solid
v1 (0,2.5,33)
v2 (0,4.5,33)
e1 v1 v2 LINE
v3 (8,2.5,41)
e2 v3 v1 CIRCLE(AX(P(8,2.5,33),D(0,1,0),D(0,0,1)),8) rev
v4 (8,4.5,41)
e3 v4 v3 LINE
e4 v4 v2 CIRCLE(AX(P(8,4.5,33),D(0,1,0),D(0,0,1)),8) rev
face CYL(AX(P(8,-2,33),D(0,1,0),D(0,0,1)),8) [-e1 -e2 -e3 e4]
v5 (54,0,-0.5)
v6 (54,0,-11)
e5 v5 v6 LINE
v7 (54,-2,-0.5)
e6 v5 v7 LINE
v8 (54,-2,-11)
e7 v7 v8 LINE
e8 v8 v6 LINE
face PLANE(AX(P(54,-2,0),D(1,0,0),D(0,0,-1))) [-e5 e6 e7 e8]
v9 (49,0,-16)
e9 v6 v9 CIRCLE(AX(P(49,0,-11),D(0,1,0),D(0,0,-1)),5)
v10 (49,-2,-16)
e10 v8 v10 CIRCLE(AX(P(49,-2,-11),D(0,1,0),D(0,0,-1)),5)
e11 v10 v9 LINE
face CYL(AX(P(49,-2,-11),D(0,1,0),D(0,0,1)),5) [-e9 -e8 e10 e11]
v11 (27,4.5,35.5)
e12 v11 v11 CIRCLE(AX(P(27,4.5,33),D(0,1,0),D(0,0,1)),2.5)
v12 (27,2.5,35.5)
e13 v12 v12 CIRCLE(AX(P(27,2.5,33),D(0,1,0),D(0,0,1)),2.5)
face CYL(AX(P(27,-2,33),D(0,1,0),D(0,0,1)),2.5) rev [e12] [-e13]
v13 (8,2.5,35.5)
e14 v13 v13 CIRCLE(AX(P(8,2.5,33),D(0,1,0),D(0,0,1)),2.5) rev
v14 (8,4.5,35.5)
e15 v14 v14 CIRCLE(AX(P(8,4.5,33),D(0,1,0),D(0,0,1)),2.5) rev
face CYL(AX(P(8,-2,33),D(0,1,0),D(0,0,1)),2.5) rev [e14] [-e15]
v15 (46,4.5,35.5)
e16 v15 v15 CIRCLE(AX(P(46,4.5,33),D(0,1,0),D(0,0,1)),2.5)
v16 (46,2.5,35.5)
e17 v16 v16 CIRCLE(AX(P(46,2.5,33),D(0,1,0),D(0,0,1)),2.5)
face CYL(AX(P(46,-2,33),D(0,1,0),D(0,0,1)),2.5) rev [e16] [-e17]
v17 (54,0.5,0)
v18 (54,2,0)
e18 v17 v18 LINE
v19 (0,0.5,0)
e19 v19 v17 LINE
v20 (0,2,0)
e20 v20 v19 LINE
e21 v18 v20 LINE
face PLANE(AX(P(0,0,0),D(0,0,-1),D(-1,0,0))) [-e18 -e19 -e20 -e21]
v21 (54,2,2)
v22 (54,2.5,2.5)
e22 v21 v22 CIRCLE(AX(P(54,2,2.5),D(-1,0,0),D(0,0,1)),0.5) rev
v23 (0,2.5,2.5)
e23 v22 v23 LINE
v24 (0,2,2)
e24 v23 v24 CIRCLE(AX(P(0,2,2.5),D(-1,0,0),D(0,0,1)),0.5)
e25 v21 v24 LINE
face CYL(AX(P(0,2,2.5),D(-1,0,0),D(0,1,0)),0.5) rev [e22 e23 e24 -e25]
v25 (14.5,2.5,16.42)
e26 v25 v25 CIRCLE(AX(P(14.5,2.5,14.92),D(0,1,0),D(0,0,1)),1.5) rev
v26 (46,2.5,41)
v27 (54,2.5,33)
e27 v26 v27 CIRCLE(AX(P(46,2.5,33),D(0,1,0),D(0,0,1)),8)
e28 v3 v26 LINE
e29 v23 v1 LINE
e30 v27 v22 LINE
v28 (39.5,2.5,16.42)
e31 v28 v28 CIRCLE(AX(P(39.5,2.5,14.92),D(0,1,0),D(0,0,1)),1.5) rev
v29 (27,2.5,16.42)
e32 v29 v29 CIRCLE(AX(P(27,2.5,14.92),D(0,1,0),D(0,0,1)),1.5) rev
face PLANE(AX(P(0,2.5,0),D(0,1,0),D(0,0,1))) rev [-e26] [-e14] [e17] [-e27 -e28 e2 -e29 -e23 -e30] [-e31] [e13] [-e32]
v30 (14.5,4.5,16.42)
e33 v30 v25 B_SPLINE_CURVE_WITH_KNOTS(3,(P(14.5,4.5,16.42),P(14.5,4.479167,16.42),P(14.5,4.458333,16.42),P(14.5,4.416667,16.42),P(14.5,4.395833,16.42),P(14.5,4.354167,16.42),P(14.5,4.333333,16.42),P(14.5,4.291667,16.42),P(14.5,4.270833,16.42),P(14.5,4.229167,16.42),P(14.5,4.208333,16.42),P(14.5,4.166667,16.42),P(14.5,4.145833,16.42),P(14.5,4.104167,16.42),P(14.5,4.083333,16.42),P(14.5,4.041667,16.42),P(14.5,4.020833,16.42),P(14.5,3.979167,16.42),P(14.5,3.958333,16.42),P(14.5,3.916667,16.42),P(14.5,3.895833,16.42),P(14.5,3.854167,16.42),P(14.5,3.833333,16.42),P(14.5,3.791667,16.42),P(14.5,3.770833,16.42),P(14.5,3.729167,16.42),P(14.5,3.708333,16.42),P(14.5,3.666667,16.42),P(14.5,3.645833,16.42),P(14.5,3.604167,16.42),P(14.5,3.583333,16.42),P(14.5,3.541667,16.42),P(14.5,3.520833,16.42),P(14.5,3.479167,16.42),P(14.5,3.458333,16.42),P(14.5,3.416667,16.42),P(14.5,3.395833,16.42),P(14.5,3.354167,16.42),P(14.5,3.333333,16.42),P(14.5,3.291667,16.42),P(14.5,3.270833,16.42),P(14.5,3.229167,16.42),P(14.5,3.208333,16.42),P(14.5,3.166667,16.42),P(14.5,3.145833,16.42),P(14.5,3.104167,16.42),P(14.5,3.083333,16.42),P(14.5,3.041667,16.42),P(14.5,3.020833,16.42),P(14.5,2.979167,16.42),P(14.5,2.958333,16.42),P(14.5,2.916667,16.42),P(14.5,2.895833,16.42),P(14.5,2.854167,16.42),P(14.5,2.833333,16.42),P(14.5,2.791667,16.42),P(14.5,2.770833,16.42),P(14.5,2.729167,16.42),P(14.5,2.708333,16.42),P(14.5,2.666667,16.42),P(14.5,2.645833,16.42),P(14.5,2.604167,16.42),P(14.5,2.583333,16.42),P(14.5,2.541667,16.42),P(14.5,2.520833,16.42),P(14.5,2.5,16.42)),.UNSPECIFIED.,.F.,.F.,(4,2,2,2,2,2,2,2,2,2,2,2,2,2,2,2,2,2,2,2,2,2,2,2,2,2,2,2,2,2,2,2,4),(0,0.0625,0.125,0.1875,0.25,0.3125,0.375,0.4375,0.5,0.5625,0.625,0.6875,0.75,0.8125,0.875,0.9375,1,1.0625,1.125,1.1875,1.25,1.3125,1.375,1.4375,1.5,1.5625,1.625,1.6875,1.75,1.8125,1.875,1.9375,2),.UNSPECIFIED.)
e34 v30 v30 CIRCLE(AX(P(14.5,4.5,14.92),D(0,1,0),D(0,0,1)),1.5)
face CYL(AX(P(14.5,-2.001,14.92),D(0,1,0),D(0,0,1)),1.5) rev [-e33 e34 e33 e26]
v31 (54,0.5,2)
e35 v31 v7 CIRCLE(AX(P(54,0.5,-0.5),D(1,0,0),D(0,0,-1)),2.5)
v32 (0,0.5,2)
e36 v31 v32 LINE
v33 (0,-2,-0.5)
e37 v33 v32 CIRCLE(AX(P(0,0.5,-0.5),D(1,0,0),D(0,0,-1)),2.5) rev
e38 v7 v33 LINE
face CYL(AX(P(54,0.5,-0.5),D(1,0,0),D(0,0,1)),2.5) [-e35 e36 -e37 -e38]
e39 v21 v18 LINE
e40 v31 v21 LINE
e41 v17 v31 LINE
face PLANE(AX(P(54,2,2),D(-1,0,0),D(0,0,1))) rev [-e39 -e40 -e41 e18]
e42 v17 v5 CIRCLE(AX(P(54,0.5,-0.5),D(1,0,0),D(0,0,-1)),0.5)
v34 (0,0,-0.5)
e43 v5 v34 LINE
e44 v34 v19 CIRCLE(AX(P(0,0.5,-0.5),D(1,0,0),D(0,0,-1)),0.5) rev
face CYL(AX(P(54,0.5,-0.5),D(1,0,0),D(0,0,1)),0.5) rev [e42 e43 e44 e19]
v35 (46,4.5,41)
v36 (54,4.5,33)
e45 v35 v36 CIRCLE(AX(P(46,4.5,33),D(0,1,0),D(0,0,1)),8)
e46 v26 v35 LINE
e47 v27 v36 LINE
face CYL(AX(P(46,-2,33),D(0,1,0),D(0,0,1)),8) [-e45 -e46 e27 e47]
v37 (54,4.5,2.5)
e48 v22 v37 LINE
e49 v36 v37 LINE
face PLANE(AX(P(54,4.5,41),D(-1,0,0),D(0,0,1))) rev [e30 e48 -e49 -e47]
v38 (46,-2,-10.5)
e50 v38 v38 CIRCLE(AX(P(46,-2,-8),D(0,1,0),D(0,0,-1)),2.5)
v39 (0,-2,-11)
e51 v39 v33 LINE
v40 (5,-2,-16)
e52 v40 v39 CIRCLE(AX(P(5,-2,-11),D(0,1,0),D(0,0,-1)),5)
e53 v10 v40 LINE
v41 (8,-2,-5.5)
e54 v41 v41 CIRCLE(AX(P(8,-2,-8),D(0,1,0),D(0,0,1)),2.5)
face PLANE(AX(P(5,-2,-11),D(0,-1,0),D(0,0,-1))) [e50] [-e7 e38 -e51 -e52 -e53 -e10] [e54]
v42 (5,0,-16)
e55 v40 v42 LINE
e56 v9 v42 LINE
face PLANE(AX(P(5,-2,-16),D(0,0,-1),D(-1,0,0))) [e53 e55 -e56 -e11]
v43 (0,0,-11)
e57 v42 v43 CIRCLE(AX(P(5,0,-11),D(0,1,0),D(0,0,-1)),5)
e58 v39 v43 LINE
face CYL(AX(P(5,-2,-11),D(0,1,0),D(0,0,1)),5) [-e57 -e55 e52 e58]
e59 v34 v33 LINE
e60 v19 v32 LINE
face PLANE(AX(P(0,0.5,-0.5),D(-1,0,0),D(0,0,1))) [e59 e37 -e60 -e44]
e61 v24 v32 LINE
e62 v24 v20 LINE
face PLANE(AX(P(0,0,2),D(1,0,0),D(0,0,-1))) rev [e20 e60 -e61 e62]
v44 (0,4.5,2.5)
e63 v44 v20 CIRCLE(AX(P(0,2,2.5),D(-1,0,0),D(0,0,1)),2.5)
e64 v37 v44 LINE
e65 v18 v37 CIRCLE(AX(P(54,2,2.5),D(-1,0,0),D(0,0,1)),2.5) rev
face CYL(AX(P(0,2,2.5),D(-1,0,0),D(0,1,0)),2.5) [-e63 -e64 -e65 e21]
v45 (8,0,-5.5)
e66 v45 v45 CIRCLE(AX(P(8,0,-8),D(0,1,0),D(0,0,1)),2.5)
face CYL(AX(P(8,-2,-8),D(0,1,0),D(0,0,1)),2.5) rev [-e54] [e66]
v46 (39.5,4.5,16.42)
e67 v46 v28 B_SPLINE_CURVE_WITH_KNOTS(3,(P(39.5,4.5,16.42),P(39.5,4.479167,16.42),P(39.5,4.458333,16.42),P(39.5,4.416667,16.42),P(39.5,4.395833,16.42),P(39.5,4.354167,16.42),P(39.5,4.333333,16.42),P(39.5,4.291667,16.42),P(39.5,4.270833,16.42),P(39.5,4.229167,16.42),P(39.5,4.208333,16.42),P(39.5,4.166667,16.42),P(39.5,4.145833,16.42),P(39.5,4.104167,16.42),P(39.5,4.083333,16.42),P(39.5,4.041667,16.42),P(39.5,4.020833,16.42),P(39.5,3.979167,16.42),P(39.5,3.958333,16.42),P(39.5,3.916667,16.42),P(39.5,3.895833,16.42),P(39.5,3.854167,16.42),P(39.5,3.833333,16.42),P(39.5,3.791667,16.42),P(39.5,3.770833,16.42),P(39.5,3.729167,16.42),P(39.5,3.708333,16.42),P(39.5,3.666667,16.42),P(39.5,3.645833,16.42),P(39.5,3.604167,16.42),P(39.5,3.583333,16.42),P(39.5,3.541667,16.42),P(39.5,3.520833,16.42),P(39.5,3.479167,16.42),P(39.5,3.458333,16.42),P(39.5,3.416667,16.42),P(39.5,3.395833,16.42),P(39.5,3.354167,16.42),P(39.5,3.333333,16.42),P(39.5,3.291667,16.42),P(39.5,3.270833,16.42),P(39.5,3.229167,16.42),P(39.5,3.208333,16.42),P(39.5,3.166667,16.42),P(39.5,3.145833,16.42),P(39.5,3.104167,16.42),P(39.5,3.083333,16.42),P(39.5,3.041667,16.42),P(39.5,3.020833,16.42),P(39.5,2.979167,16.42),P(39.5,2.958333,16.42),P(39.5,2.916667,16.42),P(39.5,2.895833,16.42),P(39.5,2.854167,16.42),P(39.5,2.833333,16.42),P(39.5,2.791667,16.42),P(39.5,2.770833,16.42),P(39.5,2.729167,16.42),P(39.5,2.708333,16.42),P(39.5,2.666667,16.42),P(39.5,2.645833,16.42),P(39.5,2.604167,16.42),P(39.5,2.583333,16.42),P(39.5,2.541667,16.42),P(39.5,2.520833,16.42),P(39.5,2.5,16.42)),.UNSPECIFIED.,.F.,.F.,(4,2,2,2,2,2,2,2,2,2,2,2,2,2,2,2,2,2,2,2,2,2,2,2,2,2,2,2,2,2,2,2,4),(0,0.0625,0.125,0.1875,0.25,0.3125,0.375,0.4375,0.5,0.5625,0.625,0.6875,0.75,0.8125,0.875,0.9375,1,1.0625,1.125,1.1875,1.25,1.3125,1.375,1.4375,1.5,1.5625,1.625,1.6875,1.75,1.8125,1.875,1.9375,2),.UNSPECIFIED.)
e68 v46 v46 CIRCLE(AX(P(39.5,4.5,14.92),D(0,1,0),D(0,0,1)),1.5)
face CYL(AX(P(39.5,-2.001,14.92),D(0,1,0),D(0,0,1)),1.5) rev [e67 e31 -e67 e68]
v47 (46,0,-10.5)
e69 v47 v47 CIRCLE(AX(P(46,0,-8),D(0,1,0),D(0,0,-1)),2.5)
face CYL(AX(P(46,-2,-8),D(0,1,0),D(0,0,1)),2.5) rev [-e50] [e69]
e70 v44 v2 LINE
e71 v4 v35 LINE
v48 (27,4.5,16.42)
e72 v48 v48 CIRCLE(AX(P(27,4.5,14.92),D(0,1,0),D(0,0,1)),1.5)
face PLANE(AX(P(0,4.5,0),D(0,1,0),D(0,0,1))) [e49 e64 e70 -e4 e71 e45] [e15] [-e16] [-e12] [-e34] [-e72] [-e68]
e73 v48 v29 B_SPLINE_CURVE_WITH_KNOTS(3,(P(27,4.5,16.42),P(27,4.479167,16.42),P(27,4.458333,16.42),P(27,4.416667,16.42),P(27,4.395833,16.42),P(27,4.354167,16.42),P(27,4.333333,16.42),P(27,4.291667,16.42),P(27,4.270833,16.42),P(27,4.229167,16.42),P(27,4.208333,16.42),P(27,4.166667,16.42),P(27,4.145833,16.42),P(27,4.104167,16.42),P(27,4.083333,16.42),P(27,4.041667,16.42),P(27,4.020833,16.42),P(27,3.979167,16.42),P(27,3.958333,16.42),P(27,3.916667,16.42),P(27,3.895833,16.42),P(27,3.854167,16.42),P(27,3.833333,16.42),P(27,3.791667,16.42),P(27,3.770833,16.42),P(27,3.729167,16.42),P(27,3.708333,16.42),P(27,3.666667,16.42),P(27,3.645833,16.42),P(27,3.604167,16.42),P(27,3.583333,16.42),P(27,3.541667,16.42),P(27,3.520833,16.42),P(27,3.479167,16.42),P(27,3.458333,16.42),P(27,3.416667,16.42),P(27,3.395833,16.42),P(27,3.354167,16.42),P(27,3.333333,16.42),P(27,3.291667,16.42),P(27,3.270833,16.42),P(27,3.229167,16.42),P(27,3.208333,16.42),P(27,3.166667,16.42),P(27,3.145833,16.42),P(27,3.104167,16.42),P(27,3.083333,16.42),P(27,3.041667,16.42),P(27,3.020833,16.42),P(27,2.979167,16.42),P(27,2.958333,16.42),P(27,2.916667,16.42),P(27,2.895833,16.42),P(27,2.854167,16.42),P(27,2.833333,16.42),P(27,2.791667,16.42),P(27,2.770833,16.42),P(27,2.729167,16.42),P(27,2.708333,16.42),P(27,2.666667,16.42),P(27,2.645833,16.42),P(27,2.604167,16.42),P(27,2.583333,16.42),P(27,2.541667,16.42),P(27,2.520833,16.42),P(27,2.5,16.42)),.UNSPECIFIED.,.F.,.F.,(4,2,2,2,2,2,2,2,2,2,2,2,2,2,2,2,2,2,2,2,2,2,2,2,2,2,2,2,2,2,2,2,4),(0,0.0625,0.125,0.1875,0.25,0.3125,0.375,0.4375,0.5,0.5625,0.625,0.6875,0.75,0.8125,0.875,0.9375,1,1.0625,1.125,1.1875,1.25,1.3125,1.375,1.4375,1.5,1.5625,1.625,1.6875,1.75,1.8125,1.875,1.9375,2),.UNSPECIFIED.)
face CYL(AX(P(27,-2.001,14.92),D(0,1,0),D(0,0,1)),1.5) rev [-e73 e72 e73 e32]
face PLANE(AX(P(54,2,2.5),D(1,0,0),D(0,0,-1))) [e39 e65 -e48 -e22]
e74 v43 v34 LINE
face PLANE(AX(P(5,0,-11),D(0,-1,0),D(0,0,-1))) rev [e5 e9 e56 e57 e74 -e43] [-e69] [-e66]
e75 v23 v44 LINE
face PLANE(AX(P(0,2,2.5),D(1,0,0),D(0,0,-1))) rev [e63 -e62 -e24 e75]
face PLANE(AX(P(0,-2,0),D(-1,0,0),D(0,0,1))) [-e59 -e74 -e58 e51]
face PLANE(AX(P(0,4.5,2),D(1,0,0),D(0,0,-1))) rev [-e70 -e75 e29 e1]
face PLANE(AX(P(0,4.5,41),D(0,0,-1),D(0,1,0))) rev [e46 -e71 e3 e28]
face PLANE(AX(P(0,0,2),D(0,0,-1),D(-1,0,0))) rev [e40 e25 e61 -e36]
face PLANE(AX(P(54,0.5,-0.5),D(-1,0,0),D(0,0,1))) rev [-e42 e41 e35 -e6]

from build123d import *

# Parameters (mm, degrees)
SKETCH1_R                    = 2.5
BASE_FLANGE1_DEPTH           = 2
EDGE_FLANGE1_STRIP_W         = 9
EDGE_FLANGE1_STRIP_H         = 2
EDGE_FLANGE1_STRIP_CUT_DEPTH = 54
EDGE_FLANGE1_DEPTH           = 54
EDGE_FLANGE2_DEPTH           = 54
SKETCH25_R                   = 2.5
CUT_EXTRUDE1_DEPTH           = 69.112040052
SKETCH26_R                   = 1.5
CUT_EXTRUDE2_DEPTH           = 2


# Sheet-metal steps are written as plain solids
with BuildPart() as part:
    # Sketch1 → Base-Flange1 (new body)
    with BuildSketch(Plane(origin=(0, 0, 0), x_dir=(1, 0, 0), z_dir=(0, 1, 0))):
        with BuildLine():
            Line((0, 0), (54, 0))
            Line((54, 0), (54, 11))
            ThreePointArc((54, 11), (52.535533906, 14.535533906), (49, 16))
            Line((49, 16), (5, 16))
            ThreePointArc((5, 16), (1.464466094, 14.535533906), (0, 11))
            Line((0, 11), (0, 0))
        make_face()
        with Locations(Location((8, 8, 0), (0, 0, 270))):
            Circle(SKETCH1_R, mode=Mode.SUBTRACT)
        with Locations(Location((46, 8, 0), (0, 0, 90))):
            Circle(SKETCH1_R, mode=Mode.SUBTRACT)
    extrude(amount=-BASE_FLANGE1_DEPTH)

    # Edge-Flange1 strip (across the edge) → Edge-Flange1 strip cut (cut)
    with BuildSketch(Plane(origin=(0, 0, 0), x_dir=(0, 0, -1), z_dir=(1, 0, 0))):
        with Locations((-4, -1)):
            Rectangle(EDGE_FLANGE1_STRIP_W, EDGE_FLANGE1_STRIP_H)
    extrude(amount=EDGE_FLANGE1_STRIP_CUT_DEPTH, mode=Mode.SUBTRACT)

    # Edge-Flange1 section (across the edge) → Edge-Flange1 (add)
    with BuildSketch(Plane(origin=(0, 0, 0), x_dir=(0, 0, -1), z_dir=(1, 0, 0))):
        with BuildLine():
            Line((-2, 0.5), (-2, 2))
            Line((-2, 2), (0, 2))
            Line((0, 2), (0, 0.5))
            ThreePointArc((0, 0.5), (0.146446609, 0.146446609), (0.5, 0))
            Line((0.5, 0), (0.5, -2))
            ThreePointArc((0.5, -2), (-1.267766953, -1.267766953), (-2, 0.5))
        make_face()
    extrude(amount=EDGE_FLANGE1_DEPTH)

    # Edge-Flange2 section (across the edge) → Edge-Flange2 (add)
    with BuildSketch(Plane(origin=(54, 2.5, 2), x_dir=(0, -1, 0), z_dir=(-1, 0, 0))):
        with BuildLine():
            Line((-2, 0.5), (-2, 39))
            Line((-2, 39), (0, 39))
            Line((0, 39), (0, 0.5))
            ThreePointArc((0, 0.5), (0.146446609, 0.146446609), (0.5, 0))
            Line((0.5, 0), (0.5, -2))
            ThreePointArc((0.5, -2), (-1.267766953, -1.267766953), (-2, 0.5))
        make_face()
    extrude(amount=EDGE_FLANGE2_DEPTH)

    # Sketch25 → Cut-Extrude1 (cut, through all)
    with BuildSketch(Plane(origin=(0, 4.5, 0), x_dir=(1, 0, 0), z_dir=(0, 1, 0))):
        with Locations(Location((27, -33, 0), (0, 0, 270))):
            Circle(SKETCH25_R)
        with Locations(Location((8, -33, 0), (0, 0, 270))):
            Circle(SKETCH25_R)
        with BuildLine():
            ThreePointArc((8, -41), (2.343145751, -38.656854249), (0, -33))
            Line((0, -33), (0, -41))
            Line((0, -41), (8, -41))
        make_face()
        with Locations(Location((46, -33, 0), (0, 0, 270))):
            Circle(SKETCH25_R)
        with BuildLine():
            Line((54, -41), (54, -33))
            ThreePointArc((54, -33), (51.656854249, -38.656854249), (46, -41))
            Line((46, -41), (54, -41))
        make_face()
    extrude(amount=-CUT_EXTRUDE1_DEPTH, mode=Mode.SUBTRACT)

    # Sketch26 → Cut-Extrude2 (cut)
    with BuildSketch(Plane(origin=(0, 4.5, 0), x_dir=(1, 0, 0), z_dir=(0, 1, 0))):
        with Locations(Location((39.5, -14.92, 0), (0, 0, 270))):
            Circle(SKETCH26_R)
        with Locations(Location((27, -14.92, 0), (0, 0, 270))):
            Circle(SKETCH26_R)
        with Locations(Location((14.5, -14.92, 0), (0, 0, 270))):
            Circle(SKETCH26_R)
    extrude(amount=-CUT_EXTRUDE2_DEPTH, mode=Mode.SUBTRACT)


solid = part.part
